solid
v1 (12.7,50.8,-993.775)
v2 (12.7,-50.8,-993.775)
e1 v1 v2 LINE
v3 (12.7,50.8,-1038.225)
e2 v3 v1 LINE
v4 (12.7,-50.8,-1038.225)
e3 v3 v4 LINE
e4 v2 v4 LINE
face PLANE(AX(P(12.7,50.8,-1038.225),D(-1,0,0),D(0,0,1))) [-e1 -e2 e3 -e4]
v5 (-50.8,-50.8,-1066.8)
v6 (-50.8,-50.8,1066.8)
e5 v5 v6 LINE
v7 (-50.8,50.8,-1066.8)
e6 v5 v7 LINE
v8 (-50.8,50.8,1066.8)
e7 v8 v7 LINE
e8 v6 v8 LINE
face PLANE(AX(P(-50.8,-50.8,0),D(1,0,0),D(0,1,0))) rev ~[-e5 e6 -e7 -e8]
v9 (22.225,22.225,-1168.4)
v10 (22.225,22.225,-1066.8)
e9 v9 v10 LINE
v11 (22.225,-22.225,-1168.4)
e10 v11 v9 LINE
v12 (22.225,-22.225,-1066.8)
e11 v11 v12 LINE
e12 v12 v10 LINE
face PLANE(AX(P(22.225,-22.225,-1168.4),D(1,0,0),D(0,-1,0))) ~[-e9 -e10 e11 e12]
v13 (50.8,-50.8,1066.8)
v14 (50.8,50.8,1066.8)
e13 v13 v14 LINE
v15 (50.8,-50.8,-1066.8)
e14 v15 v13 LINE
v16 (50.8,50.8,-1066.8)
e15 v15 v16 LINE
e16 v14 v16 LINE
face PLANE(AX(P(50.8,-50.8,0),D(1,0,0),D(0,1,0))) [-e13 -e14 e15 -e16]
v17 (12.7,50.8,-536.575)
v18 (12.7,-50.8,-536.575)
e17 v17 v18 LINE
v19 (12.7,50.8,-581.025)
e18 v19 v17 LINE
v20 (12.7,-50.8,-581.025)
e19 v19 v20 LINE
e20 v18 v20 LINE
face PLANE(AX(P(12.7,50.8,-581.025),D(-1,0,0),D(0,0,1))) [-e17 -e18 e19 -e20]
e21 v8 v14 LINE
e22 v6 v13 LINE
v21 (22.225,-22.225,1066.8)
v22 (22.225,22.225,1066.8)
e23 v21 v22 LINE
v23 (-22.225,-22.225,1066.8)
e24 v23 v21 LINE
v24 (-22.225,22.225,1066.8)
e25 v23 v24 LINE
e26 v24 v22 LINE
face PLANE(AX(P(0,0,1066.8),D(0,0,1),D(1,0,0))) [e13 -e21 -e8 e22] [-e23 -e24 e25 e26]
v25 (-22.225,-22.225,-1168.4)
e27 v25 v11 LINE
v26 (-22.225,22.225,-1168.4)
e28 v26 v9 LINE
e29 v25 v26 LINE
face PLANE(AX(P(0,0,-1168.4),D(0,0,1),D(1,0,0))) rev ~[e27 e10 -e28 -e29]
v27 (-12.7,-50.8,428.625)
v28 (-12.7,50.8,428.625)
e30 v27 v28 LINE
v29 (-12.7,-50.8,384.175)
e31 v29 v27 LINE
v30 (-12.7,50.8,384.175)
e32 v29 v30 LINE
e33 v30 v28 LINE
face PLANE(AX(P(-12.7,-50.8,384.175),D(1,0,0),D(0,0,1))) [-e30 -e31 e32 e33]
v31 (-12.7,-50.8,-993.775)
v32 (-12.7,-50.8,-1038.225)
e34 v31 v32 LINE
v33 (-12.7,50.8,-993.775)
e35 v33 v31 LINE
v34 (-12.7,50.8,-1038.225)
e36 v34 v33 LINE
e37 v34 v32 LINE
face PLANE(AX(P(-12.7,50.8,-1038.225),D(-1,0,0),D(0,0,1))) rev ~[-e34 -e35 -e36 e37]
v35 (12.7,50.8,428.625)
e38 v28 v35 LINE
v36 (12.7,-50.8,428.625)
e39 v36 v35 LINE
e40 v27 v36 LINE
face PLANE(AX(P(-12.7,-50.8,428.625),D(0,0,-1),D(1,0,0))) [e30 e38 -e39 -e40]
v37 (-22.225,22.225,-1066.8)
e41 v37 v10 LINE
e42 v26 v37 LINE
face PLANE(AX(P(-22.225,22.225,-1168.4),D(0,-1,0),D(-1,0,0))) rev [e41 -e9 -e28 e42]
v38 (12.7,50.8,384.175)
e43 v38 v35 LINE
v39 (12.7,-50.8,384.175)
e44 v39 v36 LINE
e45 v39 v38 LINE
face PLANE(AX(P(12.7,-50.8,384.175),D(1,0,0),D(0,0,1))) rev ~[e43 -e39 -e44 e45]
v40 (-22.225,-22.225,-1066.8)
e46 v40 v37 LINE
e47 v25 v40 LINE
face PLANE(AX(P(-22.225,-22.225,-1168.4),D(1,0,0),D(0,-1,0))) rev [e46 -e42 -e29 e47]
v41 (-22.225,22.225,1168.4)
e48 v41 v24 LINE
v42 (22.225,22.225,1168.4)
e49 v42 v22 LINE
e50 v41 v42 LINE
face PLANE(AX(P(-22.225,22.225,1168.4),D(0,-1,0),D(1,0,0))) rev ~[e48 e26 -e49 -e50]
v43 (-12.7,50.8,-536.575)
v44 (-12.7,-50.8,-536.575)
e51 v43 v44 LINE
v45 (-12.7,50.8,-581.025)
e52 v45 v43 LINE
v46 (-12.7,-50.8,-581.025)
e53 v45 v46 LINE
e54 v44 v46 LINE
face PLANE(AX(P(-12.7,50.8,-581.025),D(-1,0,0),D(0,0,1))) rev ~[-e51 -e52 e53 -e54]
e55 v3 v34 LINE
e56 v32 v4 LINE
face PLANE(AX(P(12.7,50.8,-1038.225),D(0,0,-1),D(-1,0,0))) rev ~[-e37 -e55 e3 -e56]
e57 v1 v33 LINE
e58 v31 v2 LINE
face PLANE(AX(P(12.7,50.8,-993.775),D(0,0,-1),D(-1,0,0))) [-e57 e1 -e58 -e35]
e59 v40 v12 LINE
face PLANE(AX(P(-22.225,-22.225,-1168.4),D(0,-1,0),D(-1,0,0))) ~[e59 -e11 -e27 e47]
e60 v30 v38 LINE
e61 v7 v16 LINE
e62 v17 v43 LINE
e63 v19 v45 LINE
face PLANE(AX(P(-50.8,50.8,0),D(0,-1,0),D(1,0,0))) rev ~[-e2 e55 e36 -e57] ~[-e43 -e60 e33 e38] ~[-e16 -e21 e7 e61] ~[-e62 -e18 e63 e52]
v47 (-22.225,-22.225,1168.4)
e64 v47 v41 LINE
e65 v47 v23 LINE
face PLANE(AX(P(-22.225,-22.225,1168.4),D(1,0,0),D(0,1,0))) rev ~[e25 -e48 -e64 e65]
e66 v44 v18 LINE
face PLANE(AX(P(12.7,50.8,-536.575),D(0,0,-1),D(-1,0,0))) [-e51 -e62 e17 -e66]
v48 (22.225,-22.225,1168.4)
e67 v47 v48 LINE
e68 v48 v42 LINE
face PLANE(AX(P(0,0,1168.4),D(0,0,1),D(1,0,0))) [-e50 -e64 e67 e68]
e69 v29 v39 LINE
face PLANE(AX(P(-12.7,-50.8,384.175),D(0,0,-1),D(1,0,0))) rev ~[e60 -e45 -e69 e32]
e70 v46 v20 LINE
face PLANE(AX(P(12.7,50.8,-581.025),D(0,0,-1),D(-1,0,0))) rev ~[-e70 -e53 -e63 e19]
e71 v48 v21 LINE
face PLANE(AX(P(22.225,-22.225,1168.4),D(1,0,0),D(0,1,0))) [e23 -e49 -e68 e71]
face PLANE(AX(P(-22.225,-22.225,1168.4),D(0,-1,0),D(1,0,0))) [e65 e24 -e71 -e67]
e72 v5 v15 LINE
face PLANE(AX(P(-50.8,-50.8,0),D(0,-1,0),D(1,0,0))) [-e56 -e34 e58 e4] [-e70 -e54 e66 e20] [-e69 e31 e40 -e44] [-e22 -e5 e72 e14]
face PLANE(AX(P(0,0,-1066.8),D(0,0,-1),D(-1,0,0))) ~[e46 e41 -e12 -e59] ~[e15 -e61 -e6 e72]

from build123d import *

# Parameters (mm, degrees)
F0_W     = 101.6
F0_H     = 101.6
F1_DEPTH = 1168.4
F2_W     = 101.6
F2_H     = 101.6
F2_W_2   = 44.45
F2_H_2   = 44.45
F3_DEPTH = 101.6
F4_W     = 25.4
F4_H     = 44.45
F5_DEPTH = 101.601
F6_W     = 25.4
F6_H     = 44.45
F7_DEPTH = 101.601
F8_W     = 25.4
F8_H     = 44.45
F9_DEPTH = 101.601


# Not quite as in the source:
# - a pattern or mirror of a feature is missing from the dataset's text; its kind, count and spacing are read off the source's solid


with BuildPart() as f1:
    # F0 (on Top) → F1 (new body, symmetric)
    with BuildSketch(Plane.XY):
        Rectangle(F0_W, F0_H)
    extrude(amount=F1_DEPTH, both=True)

    # F2 (on face) → F3 (cut)
    with BuildSketch(Plane.XY.offset(1168.4)):
        Rectangle(F2_W, F2_H)
        Rectangle(F2_W_2, F2_H_2, mode=Mode.SUBTRACT)
    f3 = extrude(amount=-F3_DEPTH, mode=Mode.SUBTRACT)

    # F3_copies: F3 across plane
    add(f3.mirror(Plane(origin=(0, 0, 0), x_dir=(-1, 0, 0), z_dir=(0, 0, -1))), mode=Mode.SUBTRACT)

    # F4 (on face) → F5 (cut, through all)
    with BuildSketch(Plane.XZ.offset(50.8)):
        with Locations((0, 406.4)):
            Rectangle(F4_W, F4_H)
    extrude(amount=-F5_DEPTH, mode=Mode.SUBTRACT)

    # F6 (on face) → F7 (cut, through all)
    with BuildSketch(Plane(origin=(0, 50.8, 0), x_dir=(-1, 0, 0), z_dir=(0, 1, 0))):
        with Locations((0, -558.8)):
            Rectangle(F6_W, F6_H)
    extrude(amount=-F7_DEPTH, mode=Mode.SUBTRACT)

    # F8 (on face) → F9 (cut, through all)
    with BuildSketch(Plane(origin=(0, 50.8, 0), x_dir=(-1, 0, 0), z_dir=(0, 1, 0))):
        with Locations((0, -1016)):
            Rectangle(F8_W, F8_H)
    extrude(amount=-F9_DEPTH, mode=Mode.SUBTRACT)


solid = f1.part
